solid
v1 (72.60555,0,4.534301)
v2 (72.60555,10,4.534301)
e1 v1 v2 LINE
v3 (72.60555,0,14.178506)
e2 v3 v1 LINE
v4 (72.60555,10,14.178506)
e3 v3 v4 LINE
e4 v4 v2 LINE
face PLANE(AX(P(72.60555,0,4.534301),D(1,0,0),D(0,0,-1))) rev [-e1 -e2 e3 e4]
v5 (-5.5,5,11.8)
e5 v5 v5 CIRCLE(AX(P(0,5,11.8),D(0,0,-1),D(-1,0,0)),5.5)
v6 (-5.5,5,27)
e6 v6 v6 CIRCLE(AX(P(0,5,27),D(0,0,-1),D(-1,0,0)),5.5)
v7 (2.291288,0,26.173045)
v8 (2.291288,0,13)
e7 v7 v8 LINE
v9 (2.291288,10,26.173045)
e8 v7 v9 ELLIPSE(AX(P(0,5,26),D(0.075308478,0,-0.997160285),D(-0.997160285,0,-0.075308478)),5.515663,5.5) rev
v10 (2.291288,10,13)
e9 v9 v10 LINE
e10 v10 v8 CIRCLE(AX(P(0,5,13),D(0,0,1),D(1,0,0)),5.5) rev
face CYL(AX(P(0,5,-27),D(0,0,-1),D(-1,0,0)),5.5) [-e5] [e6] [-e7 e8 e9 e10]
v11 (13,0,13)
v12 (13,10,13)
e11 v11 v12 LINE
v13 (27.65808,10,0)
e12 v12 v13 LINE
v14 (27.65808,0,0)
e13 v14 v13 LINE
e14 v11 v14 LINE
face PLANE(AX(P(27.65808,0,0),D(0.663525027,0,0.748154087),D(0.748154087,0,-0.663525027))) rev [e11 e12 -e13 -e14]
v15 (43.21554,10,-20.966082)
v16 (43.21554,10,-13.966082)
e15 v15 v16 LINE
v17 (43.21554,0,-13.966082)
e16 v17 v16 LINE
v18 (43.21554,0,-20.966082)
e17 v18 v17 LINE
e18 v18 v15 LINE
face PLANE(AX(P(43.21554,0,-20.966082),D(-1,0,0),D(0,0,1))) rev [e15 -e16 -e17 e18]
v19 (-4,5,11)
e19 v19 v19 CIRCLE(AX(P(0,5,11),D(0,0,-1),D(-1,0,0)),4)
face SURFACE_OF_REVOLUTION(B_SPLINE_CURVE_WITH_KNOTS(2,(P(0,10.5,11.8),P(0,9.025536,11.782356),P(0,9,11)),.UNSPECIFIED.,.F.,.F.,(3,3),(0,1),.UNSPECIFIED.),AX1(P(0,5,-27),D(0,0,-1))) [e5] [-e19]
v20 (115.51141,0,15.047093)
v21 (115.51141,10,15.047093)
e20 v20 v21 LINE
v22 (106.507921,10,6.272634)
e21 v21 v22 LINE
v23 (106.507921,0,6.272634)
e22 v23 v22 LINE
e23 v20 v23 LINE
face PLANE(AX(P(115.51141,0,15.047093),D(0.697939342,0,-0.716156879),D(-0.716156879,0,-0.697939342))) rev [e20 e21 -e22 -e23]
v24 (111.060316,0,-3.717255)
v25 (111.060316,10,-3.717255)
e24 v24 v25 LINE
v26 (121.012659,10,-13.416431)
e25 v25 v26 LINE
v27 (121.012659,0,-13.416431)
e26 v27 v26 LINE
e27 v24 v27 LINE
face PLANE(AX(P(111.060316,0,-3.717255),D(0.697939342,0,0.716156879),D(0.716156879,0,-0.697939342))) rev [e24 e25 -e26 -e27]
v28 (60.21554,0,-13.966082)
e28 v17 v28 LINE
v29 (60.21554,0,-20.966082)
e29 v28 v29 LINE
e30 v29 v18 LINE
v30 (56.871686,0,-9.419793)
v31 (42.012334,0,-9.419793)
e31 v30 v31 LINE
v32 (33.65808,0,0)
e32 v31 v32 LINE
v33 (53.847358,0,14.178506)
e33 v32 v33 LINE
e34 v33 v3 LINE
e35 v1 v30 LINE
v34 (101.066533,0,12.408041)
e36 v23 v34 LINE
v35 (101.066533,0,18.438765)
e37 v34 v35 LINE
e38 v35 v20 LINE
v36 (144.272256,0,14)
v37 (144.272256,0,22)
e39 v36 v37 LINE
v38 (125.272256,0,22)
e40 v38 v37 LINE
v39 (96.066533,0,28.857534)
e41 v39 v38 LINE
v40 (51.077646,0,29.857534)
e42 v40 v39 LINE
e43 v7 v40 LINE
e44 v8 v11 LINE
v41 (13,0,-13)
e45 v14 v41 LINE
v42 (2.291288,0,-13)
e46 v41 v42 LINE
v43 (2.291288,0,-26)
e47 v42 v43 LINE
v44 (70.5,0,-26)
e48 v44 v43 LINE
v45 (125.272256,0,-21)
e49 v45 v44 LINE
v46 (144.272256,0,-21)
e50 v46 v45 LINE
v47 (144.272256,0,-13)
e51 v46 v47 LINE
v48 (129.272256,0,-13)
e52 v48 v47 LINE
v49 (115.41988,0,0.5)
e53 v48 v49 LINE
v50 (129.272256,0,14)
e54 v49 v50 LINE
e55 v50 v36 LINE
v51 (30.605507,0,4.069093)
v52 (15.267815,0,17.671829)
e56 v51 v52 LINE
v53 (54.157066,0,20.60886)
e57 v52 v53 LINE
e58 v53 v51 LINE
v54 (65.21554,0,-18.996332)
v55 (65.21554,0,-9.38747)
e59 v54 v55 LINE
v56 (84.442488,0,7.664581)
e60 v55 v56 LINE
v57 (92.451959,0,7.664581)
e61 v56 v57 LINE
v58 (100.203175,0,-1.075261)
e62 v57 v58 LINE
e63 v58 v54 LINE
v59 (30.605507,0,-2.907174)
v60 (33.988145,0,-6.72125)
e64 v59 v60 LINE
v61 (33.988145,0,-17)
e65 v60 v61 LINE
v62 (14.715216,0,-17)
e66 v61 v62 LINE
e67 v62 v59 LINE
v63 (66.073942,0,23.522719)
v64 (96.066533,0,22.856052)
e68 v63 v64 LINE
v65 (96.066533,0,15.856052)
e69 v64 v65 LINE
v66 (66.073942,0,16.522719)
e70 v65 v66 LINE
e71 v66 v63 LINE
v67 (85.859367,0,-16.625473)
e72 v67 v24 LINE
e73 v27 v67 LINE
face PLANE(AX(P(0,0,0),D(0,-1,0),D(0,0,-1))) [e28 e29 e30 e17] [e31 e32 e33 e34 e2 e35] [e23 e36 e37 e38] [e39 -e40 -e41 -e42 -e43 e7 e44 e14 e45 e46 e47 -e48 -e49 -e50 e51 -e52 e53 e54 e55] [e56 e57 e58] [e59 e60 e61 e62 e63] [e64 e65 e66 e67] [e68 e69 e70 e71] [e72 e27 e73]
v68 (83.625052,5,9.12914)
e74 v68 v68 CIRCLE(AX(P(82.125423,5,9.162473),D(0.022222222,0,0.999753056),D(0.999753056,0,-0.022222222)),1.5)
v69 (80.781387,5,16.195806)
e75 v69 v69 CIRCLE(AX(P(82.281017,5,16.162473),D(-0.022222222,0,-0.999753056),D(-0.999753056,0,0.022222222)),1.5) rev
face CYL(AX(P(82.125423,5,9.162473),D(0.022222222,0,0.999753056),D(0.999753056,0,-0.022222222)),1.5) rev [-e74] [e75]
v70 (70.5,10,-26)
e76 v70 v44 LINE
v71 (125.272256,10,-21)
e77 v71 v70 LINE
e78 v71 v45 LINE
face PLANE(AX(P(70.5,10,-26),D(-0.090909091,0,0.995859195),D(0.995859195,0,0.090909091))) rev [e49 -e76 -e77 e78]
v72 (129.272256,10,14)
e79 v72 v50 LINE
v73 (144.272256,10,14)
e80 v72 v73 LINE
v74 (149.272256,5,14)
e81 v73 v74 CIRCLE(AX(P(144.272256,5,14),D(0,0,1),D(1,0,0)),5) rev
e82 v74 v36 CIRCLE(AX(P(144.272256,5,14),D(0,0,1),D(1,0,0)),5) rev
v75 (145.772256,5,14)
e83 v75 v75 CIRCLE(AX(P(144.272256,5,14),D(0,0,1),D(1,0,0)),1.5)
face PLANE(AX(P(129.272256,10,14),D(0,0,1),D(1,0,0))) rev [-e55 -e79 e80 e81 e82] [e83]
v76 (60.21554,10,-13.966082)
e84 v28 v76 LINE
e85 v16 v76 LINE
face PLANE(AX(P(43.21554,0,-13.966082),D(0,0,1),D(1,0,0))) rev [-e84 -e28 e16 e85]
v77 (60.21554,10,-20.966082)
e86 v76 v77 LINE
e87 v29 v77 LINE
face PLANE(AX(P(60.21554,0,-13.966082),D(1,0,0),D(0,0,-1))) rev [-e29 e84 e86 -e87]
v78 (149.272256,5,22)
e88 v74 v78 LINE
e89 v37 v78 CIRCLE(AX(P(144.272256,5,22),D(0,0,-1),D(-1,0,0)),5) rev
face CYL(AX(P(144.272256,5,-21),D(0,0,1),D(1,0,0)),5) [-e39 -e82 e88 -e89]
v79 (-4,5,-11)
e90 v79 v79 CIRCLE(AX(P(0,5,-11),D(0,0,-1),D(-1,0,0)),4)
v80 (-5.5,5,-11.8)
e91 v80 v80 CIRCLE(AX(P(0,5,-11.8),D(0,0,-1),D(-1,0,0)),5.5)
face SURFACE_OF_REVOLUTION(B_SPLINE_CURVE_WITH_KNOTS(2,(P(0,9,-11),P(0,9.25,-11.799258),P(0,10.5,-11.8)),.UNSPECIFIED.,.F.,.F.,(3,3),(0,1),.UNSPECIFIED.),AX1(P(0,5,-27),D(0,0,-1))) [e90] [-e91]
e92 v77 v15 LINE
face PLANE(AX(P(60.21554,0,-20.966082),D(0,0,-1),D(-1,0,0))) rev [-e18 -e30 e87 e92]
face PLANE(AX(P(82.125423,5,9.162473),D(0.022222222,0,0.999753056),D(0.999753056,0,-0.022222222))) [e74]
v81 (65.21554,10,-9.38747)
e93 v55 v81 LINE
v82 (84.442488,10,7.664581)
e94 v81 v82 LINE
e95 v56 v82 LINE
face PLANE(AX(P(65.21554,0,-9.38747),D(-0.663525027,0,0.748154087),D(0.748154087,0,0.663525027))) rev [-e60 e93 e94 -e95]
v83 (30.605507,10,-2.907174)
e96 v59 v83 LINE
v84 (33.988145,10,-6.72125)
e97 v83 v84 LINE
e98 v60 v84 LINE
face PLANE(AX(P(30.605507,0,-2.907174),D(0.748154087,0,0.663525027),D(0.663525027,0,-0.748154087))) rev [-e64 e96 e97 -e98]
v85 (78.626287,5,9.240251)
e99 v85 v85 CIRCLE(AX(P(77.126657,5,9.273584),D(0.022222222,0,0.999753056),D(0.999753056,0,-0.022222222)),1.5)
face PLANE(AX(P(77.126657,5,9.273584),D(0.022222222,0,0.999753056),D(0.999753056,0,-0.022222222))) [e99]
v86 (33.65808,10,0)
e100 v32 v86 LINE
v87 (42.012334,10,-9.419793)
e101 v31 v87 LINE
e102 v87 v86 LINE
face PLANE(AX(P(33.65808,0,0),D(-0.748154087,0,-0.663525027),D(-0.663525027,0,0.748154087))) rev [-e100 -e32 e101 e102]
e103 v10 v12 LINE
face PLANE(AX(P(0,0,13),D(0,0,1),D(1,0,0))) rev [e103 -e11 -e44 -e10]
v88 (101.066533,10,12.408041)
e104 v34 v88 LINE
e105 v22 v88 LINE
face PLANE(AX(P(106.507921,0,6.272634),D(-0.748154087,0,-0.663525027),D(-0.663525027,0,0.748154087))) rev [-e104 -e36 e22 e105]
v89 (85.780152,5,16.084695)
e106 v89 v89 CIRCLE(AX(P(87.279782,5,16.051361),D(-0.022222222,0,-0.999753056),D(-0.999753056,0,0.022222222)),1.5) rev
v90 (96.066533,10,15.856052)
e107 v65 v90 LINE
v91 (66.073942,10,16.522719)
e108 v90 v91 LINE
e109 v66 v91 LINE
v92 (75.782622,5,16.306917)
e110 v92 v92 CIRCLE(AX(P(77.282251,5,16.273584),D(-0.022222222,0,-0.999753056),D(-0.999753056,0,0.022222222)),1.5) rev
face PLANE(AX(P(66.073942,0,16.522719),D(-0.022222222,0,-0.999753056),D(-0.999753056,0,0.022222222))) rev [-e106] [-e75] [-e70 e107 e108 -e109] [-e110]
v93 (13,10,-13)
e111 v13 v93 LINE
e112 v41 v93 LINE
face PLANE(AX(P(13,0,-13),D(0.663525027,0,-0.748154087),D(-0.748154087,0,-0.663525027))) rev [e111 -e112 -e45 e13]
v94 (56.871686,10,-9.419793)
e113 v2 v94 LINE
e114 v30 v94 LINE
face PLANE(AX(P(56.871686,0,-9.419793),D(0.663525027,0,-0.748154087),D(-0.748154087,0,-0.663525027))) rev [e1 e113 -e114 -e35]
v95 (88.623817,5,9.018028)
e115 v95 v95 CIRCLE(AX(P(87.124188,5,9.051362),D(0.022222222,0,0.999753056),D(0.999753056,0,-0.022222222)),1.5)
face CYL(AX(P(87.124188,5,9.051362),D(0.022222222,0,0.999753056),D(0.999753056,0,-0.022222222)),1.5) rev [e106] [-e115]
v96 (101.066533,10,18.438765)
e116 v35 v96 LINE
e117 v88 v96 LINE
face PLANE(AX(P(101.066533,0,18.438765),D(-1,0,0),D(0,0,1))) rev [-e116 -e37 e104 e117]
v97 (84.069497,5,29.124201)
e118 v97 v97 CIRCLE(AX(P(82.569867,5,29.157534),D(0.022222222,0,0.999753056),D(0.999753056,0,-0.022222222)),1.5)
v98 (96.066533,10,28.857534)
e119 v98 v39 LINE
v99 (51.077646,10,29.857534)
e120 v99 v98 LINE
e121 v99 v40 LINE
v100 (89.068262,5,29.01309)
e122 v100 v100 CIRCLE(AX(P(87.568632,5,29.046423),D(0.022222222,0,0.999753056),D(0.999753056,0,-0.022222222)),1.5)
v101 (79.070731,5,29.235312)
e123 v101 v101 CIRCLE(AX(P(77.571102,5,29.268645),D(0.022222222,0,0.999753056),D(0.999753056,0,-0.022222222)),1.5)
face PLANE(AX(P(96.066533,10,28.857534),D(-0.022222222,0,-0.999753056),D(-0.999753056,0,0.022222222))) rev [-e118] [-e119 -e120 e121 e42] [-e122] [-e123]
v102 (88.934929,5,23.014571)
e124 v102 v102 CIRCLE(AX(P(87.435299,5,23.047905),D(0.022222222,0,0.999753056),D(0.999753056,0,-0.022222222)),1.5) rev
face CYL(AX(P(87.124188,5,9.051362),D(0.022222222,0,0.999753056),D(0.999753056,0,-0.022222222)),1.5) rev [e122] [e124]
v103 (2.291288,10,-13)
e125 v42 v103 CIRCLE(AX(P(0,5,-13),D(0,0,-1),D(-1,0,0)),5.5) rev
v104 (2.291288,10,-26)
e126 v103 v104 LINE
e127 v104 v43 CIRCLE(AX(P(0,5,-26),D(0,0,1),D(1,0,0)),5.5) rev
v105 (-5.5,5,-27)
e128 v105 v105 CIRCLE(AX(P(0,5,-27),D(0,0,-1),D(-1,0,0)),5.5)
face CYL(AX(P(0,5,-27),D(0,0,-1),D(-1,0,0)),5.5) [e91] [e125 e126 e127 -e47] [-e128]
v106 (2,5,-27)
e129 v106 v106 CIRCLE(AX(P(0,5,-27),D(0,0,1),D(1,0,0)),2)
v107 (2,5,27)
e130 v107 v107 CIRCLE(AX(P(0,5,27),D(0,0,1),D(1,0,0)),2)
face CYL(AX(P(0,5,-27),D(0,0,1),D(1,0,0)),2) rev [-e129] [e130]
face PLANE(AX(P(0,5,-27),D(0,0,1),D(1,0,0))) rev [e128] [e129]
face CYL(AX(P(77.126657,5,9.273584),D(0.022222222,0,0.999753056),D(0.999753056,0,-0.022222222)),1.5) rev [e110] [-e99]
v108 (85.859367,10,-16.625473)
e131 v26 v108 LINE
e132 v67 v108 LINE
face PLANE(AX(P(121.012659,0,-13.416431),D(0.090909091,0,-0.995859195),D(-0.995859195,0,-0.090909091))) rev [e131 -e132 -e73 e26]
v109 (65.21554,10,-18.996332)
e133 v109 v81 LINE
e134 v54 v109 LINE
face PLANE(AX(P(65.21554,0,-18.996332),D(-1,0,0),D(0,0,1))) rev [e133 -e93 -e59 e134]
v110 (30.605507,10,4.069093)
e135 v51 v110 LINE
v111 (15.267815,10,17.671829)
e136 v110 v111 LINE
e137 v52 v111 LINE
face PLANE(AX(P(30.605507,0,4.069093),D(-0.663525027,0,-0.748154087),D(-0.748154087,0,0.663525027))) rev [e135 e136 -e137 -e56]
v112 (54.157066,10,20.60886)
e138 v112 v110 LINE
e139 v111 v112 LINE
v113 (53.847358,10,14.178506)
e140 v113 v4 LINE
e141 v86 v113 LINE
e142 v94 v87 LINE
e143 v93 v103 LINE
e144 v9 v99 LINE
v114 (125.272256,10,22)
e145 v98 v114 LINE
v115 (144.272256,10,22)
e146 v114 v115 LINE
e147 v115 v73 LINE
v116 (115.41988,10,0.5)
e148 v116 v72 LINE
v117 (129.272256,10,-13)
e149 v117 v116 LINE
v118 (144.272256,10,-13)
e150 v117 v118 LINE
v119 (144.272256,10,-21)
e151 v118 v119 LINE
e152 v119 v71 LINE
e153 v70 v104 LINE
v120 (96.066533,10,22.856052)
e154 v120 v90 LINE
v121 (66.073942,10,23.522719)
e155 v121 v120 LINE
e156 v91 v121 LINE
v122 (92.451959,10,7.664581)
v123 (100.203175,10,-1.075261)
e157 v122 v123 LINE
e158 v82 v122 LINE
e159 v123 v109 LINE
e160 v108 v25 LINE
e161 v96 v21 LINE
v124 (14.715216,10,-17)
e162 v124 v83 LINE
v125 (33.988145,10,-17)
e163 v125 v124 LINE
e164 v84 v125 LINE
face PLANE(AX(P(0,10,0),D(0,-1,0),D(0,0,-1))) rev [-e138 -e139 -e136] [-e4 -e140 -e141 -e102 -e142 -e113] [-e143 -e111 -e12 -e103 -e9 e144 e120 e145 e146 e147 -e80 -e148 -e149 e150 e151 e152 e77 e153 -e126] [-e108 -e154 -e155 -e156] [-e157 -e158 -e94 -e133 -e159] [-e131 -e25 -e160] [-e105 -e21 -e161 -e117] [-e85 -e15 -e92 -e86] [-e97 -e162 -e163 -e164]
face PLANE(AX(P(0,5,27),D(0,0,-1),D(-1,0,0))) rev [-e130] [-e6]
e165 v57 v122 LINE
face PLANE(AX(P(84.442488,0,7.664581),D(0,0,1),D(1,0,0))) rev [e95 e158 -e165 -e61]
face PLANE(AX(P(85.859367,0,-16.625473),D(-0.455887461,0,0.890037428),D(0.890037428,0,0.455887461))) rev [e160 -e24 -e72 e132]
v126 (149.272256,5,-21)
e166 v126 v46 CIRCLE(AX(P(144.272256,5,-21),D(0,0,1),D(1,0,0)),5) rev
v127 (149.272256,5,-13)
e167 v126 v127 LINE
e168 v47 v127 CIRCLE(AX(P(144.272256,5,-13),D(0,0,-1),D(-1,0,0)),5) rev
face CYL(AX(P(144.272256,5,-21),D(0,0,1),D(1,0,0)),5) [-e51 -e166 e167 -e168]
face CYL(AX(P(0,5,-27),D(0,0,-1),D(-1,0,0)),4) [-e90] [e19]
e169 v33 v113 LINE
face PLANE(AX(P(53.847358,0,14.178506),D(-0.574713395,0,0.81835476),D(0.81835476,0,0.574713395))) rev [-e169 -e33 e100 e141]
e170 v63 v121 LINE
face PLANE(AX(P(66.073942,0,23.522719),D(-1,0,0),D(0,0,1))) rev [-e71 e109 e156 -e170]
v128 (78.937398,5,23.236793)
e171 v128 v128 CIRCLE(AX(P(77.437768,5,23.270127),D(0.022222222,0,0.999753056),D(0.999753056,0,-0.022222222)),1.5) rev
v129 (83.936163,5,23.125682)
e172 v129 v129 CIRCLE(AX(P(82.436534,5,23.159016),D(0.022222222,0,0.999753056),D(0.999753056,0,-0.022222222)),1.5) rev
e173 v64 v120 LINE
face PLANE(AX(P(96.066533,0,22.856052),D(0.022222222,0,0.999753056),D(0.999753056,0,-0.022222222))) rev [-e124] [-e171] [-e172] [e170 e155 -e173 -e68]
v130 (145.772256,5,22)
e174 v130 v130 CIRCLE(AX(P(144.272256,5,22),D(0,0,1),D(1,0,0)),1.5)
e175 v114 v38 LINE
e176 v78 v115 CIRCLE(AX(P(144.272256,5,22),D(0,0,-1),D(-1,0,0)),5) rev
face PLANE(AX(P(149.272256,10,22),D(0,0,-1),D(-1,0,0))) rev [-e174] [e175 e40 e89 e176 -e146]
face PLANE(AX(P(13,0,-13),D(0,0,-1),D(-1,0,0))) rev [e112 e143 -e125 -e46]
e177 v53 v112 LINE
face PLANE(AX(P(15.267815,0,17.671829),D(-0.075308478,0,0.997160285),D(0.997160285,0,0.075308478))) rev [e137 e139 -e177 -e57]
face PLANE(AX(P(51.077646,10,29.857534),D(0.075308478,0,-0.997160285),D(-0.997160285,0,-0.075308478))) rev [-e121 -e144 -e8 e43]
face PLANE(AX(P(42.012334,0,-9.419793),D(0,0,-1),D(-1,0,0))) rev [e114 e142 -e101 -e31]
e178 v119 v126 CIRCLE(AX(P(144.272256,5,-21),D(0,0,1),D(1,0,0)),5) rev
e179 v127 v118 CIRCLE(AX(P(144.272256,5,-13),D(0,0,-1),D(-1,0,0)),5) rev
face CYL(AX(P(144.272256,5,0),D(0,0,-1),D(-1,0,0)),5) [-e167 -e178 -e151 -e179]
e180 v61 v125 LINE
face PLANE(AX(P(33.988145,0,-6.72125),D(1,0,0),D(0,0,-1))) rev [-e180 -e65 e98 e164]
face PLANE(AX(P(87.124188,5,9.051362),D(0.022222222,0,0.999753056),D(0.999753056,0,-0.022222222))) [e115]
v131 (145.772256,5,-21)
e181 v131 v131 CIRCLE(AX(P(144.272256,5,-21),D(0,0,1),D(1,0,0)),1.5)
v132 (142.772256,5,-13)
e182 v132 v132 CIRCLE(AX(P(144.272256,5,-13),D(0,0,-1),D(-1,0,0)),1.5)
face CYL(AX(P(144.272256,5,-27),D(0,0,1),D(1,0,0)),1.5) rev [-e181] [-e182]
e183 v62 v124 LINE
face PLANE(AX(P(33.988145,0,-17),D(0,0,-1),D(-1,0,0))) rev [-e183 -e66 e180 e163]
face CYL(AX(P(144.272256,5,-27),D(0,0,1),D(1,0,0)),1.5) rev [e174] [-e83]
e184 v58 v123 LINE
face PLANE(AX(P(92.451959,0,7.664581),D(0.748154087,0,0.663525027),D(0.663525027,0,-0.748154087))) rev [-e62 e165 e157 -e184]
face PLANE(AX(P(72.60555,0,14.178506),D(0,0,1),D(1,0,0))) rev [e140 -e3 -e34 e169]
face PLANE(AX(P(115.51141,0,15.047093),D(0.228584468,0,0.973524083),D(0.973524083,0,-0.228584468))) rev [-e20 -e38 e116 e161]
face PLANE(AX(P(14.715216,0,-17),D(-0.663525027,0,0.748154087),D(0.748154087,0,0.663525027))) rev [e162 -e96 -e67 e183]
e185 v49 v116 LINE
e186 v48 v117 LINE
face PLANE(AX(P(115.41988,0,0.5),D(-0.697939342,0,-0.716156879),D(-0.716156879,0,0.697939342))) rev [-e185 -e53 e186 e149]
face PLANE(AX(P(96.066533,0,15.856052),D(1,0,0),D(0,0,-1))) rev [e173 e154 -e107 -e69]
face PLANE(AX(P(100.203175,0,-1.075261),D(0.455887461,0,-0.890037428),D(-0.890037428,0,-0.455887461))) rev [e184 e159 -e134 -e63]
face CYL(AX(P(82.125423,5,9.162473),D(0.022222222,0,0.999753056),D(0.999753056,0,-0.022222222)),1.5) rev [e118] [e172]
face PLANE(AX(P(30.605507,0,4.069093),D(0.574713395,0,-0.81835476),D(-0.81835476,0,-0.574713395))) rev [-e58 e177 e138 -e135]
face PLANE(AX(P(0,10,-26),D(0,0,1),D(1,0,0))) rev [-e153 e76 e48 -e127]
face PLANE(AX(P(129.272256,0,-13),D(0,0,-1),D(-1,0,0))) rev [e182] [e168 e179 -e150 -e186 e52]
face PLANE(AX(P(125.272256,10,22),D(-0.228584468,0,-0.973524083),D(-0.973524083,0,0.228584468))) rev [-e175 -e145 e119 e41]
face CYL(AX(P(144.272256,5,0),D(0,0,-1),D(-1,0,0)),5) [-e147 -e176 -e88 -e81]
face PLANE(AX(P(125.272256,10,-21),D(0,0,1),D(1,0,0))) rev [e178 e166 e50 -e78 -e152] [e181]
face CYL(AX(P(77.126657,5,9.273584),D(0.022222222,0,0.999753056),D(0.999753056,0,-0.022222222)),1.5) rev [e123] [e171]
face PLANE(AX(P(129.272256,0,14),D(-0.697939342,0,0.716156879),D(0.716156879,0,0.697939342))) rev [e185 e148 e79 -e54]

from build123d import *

# Parameters (mm, degrees)
RESSALTO_EXTRUS_O1_DEPTH = 10
ESBO_O4_W                = 13
ESBO_O4_H                = 26
CORTE_EXTRUS_O1_DEPTH    = 153.557132499
ESBO_O5_R                = 2
CORTE_EXTRUS_O2_DEPTH    = 160.086317259
ESBO_O6_W                = 27
ESBO_O6_H                = 10
CORTE_EXTRUS_O3_DEPTH    = 20
FILETE1_R                = 5
FILETE2_R                = 5
ESBO_O7_R                = 1.5
CORTE_EXTRUS_O4_DEPTH    = 158.459379965
ESBO_O8_R                = 1.5
CORTE_EXTRUS_O5_DEPTH    = 20
ESBO_O10_W               = 17
ESBO_O10_H               = 7
CORTE_EXTRUS_O8_DEPTH    = 10


with BuildPart() as part:
    # Esboço1 → Ressalto-extrusão1 (new body)
    with BuildSketch(Plane(origin=(0, 0, 0), x_dir=(1, 0, 0), z_dir=(0, 1, 0))):
        Polygon((0, -26), (0, 26), (70.5, 26), (125.272255751, 21), (149.272255751, 21), (149.272255751, -22), (125.272255751, -22), (96.066533251, -28.85753405), (51.077645734, -29.85753405), align=None)
    extrude(amount=RESSALTO_EXTRUS_O1_DEPTH)

    # Esboço4 → Corte-extrusão1 (cut, through all)
    with BuildSketch(Plane(origin=(0, 10, 0), x_dir=(1, 0, 0), z_dir=(0, 1, 0))):
        with Locations((6.5, 0)):
            Rectangle(ESBO_O4_W, ESBO_O4_H)
    extrude(amount=-CORTE_EXTRUS_O1_DEPTH, mode=Mode.SUBTRACT)

    # Esboço2 → Revolução1 (revolve)
    with BuildSketch(Plane.ZY, mode=Mode.PRIVATE) as revolu_o1_sk:
        with BuildLine():
            Line((-27, 5), (-27, 10.5))
            Line((-27, 10.5), (-11.8, 10.5))
            add(Edge.make_bspline(
                [(-11.8, 10.5), (-11.799257972, 9.25000022), (-11, 9)],
                knots=[0, 0, 0, 1, 1, 1], degree=2))
            Line((-11, 9), (11, 9))
            add(Edge.make_bspline(
                [(11.8, 10.5), (11.782356414, 9.025535941), (11, 9)],
                knots=[0, 0, 0, 1, 1, 1], degree=2))
            Line((11.8, 10.5), (27, 10.5))
            Line((27, 10.5), (27, 5))
            Line((27, 5), (-27, 5))
        make_face()
    revolve(revolu_o1_sk.sketch.rotate(Axis((0, 5, -27), (0, 0, 1)), 90), axis=Axis((0, 5, -27), (0, 0, 1)))

    # Esboço5 → Corte-extrusão2 (cut, through all)
    with BuildSketch(Plane.XY.offset(27)):
        with Locations((0, 5)):
            Circle(ESBO_O5_R)
    extrude(amount=-CORTE_EXTRUS_O2_DEPTH, mode=Mode.SUBTRACT)

    # Esboço6 → Corte-extrusão3 (cut)
    with BuildSketch(Plane(origin=(149.272255751, 0, 0), x_dir=(0, 0, -1), z_dir=(1, 0, 0))):
        with Locations((-0.5, 5)):
            Rectangle(ESBO_O6_W, ESBO_O6_H)
    extrude(amount=-CORTE_EXTRUS_O3_DEPTH, mode=Mode.SUBTRACT)

    # Filete1
    filete1_edges = [part.edges().sort_by_distance(p)[0] for p in [
        (149.272255751, 10, 18),
    ]]
    fillet(filete1_edges, radius=FILETE1_R)

    # Filete2
    filete2_edges = [part.edges().sort_by_distance(p)[0] for p in [
        (149.272255751, 0, -17),
        (149.272255751, 10, -17),
        (149.272255751, 0, 18),
    ]]
    fillet(filete2_edges, radius=FILETE2_R - 0.0001)  # a hair under: the kernel refuses the full size

    # Esboço7 → Corte-extrusão4 (cut, through all)
    with BuildSketch(Plane.XY.offset(22)):
        with Locations((144.272255751, 5)):
            Circle(ESBO_O7_R)
    extrude(amount=-CORTE_EXTRUS_O4_DEPTH, mode=Mode.SUBTRACT)

    # Esboço8 → Corte-extrusão5 (cut)
    with BuildSketch(Plane(origin=(0.688560438, 0, 30.977568087), x_dir=(0.9997530559290662, 0, -0.02222222222222223), z_dir=(0.02222222222222223, 0, 0.9997530559290662))):
        with Locations((86.901531655, 5)):
            Circle(ESBO_O8_R)
        with Locations((81.901531655, 5)):
            Circle(ESBO_O8_R)
        with Locations((76.901531655, 5)):
            Circle(ESBO_O8_R)
    extrude(amount=-CORTE_EXTRUS_O5_DEPTH, mode=Mode.SUBTRACT)

    # Esboço10 → Corte-extrusão8 (cut)
    with BuildSketch(Plane(origin=(0, 10, 0), x_dir=(1, 0, 0), z_dir=(0, 1, 0))):
        Polygon((96.066533251, -22.85605202), (66.073941573, -23.522718687), (66.073941573, -16.522718687), (96.066533251, -15.85605202), align=None)
        Polygon((13, 13), (27.658080306, 0), (13, -13), align=None)
        Polygon((14.715215875, 17), (30.605506577, 2.907173735), (33.988145027, 6.721249585), (33.988145027, 17), align=None)
        Polygon((30.605506577, -4.06909346), (15.267814751, -17.67182926), (54.15706585, -20.608859895), align=None)
        Polygon((33.658080306, 0), (42.012333551, 9.419793458), (56.871686456, 9.419793458), (72.605550348, -4.534300553), (72.605550348, -14.178506447), (53.847357844, -14.178506447), align=None)
        with Locations((51.715539775, 17.466082457)):
            Rectangle(ESBO_O10_W, ESBO_O10_H)
        Polygon((85.85936677, 16.625472682), (111.060316292, 3.717254981), (121.012658968, 13.416430831), align=None)
        Polygon((129.272255751, -14), (115.419880228, -0.5), (129.272255751, 13), align=None)
        Polygon((65.215539775, 18.996331638), (65.215539775, 9.387469518), (84.442487674, -7.664580783), (92.451959357, -7.664580783), (100.203174703, 1.075260526), align=None)
        Polygon((115.511410207, -15.047093106), (106.507920849, -6.272633726), (101.066533251, -12.408041141), (101.066533251, -18.438765254), align=None)
    extrude(amount=-CORTE_EXTRUS_O8_DEPTH, mode=Mode.SUBTRACT)


solid = part.part
